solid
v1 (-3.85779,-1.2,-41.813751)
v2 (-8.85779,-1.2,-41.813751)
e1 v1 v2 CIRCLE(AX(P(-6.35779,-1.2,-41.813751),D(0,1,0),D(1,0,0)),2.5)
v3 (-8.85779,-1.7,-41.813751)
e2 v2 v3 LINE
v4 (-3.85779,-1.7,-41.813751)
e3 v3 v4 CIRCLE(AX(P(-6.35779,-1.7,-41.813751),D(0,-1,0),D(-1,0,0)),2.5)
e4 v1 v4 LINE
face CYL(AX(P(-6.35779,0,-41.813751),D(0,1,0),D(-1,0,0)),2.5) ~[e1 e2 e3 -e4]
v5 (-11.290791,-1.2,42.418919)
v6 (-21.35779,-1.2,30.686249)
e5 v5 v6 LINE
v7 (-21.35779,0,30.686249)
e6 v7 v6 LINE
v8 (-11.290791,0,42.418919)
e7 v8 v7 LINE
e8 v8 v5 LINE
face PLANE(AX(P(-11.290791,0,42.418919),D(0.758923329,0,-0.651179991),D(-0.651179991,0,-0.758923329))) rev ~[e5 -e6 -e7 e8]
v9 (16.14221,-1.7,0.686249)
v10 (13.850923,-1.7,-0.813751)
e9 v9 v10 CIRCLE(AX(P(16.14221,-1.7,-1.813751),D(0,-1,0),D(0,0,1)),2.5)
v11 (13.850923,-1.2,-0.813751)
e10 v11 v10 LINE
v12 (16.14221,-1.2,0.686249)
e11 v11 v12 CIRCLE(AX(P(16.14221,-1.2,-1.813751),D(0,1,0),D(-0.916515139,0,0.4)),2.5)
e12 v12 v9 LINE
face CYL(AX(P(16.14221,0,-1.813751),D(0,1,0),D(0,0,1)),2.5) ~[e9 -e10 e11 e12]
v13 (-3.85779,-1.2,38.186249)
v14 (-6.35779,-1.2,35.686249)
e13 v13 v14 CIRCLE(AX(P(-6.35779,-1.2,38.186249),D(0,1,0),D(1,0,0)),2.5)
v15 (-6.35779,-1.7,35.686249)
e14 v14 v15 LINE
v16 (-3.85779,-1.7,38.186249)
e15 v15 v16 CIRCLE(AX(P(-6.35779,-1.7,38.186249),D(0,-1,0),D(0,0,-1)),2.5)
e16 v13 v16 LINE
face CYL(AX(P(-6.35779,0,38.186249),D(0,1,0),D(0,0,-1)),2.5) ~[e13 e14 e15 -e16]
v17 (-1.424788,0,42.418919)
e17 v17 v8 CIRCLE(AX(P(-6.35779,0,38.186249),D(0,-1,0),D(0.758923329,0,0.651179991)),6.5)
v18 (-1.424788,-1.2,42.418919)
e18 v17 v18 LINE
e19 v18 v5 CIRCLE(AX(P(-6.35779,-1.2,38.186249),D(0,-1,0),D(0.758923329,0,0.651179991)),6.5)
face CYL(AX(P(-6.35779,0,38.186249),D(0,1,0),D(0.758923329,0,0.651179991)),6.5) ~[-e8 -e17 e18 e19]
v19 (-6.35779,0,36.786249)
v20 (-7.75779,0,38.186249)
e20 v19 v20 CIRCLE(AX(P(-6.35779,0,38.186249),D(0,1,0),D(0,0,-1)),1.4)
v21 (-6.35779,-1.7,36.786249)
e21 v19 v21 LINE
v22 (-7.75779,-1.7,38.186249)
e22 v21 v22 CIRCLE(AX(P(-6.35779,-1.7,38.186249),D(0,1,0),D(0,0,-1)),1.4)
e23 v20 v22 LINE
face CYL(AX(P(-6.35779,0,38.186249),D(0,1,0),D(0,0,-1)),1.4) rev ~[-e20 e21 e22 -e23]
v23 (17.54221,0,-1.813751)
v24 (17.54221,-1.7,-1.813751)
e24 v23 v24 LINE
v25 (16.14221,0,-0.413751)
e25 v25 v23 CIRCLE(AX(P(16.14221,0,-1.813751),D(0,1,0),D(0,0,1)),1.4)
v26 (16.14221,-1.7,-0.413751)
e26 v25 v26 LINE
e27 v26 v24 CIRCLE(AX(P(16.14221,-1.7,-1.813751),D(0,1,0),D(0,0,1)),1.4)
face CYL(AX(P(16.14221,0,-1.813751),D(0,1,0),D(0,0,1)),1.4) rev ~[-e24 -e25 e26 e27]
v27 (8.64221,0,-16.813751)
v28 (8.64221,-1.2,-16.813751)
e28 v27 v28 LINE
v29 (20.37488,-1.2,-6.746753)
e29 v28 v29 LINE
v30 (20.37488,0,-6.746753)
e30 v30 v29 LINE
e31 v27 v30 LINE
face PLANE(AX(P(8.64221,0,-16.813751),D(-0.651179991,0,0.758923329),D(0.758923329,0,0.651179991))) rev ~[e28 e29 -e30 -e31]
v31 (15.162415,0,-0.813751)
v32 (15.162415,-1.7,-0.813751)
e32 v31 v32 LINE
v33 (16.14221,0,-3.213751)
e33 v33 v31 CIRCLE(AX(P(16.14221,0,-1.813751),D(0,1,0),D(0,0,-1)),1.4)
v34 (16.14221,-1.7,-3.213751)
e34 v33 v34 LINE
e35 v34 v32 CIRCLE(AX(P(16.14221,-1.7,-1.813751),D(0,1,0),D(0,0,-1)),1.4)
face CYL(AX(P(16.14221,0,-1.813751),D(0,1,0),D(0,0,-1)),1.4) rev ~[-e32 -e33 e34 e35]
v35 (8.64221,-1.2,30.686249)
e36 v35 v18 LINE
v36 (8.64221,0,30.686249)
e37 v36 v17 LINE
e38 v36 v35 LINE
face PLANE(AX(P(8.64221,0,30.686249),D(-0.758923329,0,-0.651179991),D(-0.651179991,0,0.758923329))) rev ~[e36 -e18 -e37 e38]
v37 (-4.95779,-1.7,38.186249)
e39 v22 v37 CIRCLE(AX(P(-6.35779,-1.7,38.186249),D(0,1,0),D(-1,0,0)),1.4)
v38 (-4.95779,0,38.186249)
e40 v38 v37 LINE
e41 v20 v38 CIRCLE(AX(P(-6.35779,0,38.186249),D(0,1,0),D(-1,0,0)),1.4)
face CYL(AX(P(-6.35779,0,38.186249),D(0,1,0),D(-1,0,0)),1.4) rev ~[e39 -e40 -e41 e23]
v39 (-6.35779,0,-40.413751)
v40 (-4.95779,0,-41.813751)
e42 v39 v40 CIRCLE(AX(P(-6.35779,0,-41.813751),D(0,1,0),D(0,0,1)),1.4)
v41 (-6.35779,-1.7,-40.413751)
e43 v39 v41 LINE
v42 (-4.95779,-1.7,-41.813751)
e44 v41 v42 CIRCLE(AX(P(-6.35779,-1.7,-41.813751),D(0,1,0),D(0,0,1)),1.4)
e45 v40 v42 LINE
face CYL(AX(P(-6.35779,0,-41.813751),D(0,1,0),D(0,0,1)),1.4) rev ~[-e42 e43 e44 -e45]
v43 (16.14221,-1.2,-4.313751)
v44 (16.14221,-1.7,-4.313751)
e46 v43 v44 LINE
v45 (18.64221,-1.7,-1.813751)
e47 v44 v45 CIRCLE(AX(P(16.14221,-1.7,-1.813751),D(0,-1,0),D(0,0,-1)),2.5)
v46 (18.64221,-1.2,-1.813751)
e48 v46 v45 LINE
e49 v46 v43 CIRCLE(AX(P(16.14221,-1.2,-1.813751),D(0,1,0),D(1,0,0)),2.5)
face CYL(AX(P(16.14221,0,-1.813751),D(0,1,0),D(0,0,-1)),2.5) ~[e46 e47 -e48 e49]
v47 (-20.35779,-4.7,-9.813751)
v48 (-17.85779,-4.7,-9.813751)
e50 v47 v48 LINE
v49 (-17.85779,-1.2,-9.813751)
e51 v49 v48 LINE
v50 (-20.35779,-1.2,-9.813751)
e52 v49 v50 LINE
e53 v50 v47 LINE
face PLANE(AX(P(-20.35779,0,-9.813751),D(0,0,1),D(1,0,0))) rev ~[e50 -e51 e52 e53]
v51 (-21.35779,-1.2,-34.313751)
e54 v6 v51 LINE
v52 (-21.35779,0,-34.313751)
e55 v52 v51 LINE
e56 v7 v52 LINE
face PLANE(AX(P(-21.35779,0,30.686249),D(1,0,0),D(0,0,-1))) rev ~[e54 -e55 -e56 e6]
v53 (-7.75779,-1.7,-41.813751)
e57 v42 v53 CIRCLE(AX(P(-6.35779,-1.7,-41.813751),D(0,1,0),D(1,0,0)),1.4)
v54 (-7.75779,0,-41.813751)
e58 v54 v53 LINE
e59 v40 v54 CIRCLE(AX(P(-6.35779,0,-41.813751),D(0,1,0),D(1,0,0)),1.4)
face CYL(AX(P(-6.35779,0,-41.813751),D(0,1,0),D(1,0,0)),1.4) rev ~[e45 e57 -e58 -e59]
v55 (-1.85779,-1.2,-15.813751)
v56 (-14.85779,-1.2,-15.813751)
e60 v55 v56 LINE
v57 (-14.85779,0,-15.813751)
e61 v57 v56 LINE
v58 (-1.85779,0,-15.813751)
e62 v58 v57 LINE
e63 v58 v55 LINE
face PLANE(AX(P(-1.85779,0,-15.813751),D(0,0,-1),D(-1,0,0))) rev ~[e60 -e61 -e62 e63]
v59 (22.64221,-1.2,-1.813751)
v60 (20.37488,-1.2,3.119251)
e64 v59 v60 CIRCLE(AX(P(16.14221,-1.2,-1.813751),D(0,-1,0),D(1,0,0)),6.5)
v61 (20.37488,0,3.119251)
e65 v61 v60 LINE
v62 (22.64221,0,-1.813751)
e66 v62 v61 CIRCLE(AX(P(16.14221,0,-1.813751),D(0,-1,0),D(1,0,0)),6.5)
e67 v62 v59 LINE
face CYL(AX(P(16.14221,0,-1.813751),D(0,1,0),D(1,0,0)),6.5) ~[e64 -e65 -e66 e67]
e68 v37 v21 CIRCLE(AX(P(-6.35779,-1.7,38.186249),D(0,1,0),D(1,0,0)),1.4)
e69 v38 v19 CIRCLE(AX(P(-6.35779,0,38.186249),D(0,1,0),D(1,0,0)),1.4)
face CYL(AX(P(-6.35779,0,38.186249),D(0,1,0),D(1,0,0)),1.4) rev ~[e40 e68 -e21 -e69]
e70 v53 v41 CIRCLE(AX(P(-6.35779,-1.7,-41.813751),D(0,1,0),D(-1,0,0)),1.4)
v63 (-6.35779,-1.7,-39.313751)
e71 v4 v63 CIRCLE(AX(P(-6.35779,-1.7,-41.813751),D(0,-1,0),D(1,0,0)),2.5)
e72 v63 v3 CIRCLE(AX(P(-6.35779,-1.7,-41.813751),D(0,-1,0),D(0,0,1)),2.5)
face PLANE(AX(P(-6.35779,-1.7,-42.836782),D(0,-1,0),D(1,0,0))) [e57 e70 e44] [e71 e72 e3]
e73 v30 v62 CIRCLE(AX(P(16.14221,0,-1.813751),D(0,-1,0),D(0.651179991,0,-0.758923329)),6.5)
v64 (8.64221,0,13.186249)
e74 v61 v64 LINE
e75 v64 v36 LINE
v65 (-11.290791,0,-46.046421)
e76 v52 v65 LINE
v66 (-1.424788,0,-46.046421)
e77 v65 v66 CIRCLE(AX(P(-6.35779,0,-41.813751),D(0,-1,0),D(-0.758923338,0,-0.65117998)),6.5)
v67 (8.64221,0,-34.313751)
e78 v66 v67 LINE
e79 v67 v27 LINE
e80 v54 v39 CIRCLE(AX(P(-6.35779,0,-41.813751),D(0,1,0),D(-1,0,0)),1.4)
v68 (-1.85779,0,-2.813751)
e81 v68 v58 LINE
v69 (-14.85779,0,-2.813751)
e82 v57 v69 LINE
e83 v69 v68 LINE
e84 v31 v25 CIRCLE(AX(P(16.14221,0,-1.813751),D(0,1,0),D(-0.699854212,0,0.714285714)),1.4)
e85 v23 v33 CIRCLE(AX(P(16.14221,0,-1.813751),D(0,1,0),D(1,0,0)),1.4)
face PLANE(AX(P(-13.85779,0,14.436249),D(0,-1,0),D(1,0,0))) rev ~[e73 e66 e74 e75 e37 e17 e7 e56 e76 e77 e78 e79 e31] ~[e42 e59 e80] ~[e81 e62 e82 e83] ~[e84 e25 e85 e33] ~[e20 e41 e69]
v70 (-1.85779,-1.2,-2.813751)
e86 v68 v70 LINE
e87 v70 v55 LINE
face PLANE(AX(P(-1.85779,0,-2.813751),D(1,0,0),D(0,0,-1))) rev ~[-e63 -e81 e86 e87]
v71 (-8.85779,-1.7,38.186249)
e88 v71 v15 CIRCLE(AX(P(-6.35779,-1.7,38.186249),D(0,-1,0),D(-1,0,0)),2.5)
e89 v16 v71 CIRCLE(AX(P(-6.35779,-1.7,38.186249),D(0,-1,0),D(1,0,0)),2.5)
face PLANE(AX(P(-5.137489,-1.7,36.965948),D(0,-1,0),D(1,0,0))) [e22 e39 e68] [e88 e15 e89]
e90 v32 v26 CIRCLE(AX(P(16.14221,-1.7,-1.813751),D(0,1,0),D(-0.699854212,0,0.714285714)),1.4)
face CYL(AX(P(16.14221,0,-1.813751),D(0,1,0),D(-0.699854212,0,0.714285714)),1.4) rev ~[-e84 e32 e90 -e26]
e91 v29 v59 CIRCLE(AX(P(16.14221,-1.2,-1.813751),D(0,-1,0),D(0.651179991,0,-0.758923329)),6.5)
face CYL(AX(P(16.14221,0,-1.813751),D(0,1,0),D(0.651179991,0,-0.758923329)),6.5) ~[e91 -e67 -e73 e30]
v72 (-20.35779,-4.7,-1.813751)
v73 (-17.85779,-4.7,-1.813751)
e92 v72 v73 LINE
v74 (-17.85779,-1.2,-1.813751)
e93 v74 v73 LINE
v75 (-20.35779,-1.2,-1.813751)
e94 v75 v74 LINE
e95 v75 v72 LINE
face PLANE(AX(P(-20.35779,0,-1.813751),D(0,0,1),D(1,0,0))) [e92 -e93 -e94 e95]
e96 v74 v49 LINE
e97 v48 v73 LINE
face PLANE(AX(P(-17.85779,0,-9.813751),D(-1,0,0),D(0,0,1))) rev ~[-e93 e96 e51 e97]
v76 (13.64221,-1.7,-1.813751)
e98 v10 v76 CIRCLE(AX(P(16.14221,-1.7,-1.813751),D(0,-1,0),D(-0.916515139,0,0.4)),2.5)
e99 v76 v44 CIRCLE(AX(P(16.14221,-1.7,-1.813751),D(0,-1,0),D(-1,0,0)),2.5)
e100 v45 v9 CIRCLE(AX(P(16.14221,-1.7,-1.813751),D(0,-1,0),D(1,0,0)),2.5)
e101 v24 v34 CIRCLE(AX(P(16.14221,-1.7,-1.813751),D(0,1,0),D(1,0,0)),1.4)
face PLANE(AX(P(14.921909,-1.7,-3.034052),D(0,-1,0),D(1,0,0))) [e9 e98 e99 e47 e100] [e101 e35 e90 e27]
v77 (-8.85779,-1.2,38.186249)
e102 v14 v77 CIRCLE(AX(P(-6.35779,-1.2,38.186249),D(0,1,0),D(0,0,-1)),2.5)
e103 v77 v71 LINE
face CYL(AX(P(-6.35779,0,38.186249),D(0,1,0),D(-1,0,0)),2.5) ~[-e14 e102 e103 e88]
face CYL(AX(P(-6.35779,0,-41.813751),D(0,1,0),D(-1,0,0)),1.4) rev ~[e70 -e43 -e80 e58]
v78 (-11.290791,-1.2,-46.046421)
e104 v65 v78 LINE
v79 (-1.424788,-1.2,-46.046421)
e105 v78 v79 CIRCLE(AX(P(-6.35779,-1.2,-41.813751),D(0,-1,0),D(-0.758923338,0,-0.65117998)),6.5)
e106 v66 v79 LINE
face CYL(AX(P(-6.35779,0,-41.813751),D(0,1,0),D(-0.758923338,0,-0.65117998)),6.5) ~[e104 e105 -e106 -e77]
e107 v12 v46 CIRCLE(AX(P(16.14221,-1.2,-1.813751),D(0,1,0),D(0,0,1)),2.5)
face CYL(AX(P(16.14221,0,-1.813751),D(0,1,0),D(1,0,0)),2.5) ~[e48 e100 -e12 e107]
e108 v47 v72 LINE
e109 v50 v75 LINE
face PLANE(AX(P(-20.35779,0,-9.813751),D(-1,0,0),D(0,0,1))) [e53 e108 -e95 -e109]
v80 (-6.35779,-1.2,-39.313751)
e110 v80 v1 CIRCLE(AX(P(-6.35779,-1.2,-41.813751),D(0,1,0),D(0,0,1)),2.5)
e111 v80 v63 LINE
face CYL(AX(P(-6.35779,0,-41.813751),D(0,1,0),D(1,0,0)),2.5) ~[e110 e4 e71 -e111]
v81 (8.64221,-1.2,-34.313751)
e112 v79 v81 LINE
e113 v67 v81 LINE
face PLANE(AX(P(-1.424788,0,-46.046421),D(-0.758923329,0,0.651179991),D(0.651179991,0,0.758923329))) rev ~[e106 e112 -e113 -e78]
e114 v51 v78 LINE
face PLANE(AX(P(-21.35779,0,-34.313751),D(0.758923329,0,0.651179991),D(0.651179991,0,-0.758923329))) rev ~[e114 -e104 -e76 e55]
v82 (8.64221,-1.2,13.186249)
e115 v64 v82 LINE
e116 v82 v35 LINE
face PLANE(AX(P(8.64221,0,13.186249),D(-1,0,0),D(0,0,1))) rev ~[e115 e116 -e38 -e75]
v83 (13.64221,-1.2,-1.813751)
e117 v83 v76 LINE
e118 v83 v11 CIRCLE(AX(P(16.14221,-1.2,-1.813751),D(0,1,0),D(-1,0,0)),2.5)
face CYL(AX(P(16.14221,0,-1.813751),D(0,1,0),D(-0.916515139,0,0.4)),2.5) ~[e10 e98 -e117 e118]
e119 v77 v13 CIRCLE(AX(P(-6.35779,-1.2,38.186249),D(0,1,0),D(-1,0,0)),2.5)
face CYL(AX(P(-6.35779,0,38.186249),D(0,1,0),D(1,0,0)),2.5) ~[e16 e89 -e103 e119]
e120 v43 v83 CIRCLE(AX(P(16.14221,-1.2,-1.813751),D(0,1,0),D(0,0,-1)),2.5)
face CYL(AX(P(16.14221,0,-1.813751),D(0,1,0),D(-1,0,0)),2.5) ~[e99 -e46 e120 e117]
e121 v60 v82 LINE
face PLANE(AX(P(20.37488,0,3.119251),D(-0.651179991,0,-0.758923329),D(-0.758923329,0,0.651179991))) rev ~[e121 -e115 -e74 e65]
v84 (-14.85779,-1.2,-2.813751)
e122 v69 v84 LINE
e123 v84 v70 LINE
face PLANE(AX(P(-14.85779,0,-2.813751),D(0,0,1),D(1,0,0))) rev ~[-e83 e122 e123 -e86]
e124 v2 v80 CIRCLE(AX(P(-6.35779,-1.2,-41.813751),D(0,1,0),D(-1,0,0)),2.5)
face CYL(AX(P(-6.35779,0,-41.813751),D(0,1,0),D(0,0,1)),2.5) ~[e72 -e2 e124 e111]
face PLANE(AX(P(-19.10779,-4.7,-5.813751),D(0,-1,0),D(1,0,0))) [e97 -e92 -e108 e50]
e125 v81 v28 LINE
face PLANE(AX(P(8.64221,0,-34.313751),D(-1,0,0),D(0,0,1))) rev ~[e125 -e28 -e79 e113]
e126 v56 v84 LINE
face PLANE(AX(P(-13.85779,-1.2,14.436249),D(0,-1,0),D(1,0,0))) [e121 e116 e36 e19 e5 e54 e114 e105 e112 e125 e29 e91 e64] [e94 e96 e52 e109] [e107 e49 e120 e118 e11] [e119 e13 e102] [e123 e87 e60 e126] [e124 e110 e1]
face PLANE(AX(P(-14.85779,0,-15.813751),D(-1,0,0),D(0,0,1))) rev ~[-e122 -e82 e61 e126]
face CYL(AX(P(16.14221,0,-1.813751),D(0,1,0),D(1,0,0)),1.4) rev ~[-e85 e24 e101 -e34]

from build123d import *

# Parameters (mm, degrees)
F1_DEPTH = 1.2
F2_DEPTH = 1.7
F0_W     = 2.5
F0_H     = 8
F3_DEPTH = 4.7


with BuildPart() as f1:
    # F0 (on Front) → F1 (new body)
    with BuildSketch(Plane.XZ):
        Polygon((-6.3577895987, -1.8137509867), (-6.3577895987, 30.6862490133), (-12.8577895987, 30.6862490133), (-21.3577895987, 30.6862490133), (-21.3577895987, -1.8137509867), (-20.3577895987, -1.8137509867), (-17.8577895987, -1.8137509867), align=None)
        Polygon((0.1422104013, 30.6862490133), (-6.3577895987, 30.6862490133), (-6.3577895987, -1.8137509867), (8.6422104013, -1.8137509867), (8.6422104013, -0.8137509867), (8.6422104013, 4.6862490133), (8.6422104013, 13.1862490133), (8.6422104013, 30.6862490133), align=None)
        with BuildLine():
            Line((-21.3577895987, 30.6862490133), (-12.8577895987, 30.6862490133))
            Line((-12.8577895987, 30.6862490133), (-12.8577895987, 38.1862490133))
            ThreePointArc((-12.8577895987, 38.1862490133), (-12.4534647314, 40.4429600442), (-11.2907912366, 42.4189189557))
            Line((-11.2907912366, 42.4189189557), (-21.3577895987, 30.6862490133))
        make_face()
        with BuildLine():
            Line((0.1422104013, 38.1862490133), (0.1422104013, 30.6862490133))
            Line((0.1422104013, 30.6862490133), (8.6422104013, 30.6862490133))
            Line((8.6422104013, 30.6862490133), (-1.4247879609, 42.4189189557))
            ThreePointArc((-1.4247879609, 42.4189189557), (-0.2621144661, 40.4429600442), (0.1422104013, 38.1862490133))
        make_face()
        Polygon((8.6422104013, -1.8137509867), (-6.3577895987, -1.8137509867), (-6.3577895987, -2.8137509867), (-1.8577895987, -2.8137509867), (-1.8577895987, -15.8137509867), (-6.3577895987, -15.8137509867), (-6.3577895987, -34.3137509867), (0.1422104013, -34.3137509867), (8.6422104013, -34.3137509867), (8.6422104013, -16.8137509867), (8.6422104013, -8.3137509867), align=None)
        Polygon((-6.3577895987, -2.8137509867), (-6.3577895987, -1.8137509867), (-17.8577895987, -1.8137509867), (-17.8577895987, -9.8137509867), (-20.3577895987, -9.8137509867), (-20.3577895987, -1.8137509867), (-21.3577895987, -1.8137509867), (-21.3577895987, -34.3137509867), (-12.8577895987, -34.3137509867), (-6.3577895987, -34.3137509867), (-6.3577895987, -15.8137509867), (-14.8577895987, -15.8137509867), (-14.8577895987, -2.8137509867), align=None)
        with BuildLine():
            ThreePointArc((-11.2907912366, 42.4189189557), (-12.4534647314, 40.4429600442), (-12.8577895987, 38.1862490133))
            Line((-12.8577895987, 38.1862490133), (-8.8577895987, 38.1862490133))
            ThreePointArc((-8.8577895987, 38.1862490133), (-6.3577895987, 40.6862490133), (-3.8577895987, 38.1862490133))
            Line((-3.8577895987, 38.1862490133), (0.1422104013, 38.1862490133))
            ThreePointArc((0.1422104013, 38.1862490133), (-0.2621144661, 40.4429600442), (-1.4247879609, 42.4189189557))
            ThreePointArc((-1.4247879609, 42.4189189557), (-6.3577895987, 44.6862490133), (-11.2907912366, 42.4189189557))
        make_face()
        with BuildLine():
            Line((20.3748803436, 3.1192506512), (8.6422104013, 13.1862490133))
            Line((8.6422104013, 13.1862490133), (8.6422104013, 4.6862490133))
            Line((8.6422104013, 4.6862490133), (16.1422104013, 4.6862490133))
            ThreePointArc((16.1422104013, 4.6862490133), (18.3989214322, 4.281924146), (20.3748803436, 3.1192506512))
        make_face()
        with BuildLine():
            Line((16.1422104013, -8.3137509867), (8.6422104013, -8.3137509867))
            Line((8.6422104013, -8.3137509867), (8.6422104013, -16.8137509867))
            Line((8.6422104013, -16.8137509867), (20.3748803436, -6.7467526245))
            ThreePointArc((20.3748803436, -6.7467526245), (18.3989214322, -7.9094261194), (16.1422104013, -8.3137509867))
        make_face()
        with BuildLine():
            Line((-12.8577895987, -34.3137509867), (-21.3577895987, -34.3137509867))
            Line((-21.3577895987, -34.3137509867), (-11.290791296, -46.0464208599))
            ThreePointArc((-11.290791296, -46.0464208599), (-12.4534647472, -44.0704619748), (-12.8577895987, -41.8137509867))
            Line((-12.8577895987, -41.8137509867), (-12.8577895987, -34.3137509867))
        make_face()
        with BuildLine():
            ThreePointArc((22.6422104013, -1.8137509867), (22.0482392966, 0.9008065624), (20.3748803436, 3.1192506512))
            ThreePointArc((20.3748803436, 3.1192506512), (18.3989214322, 4.281924146), (16.1422104013, 4.6862490133))
            Line((16.1422104013, 4.6862490133), (16.1422104013, 0.6862490133))
            ThreePointArc((16.1422104013, 0.6862490133), (17.9099773542, -0.0459840337), (18.6422104013, -1.8137509867))
            ThreePointArc((18.6422104013, -1.8137509867), (17.9099773542, -3.5815179397), (16.1422104013, -4.3137509867))
            Line((16.1422104013, -4.3137509867), (16.1422104013, -8.3137509867))
            ThreePointArc((16.1422104013, -8.3137509867), (18.3989214322, -7.9094261194), (20.3748803436, -6.7467526245))
            ThreePointArc((20.3748803436, -6.7467526245), (22.0482392966, -4.5283085358), (22.6422104013, -1.8137509867))
        make_face()
        with BuildLine():
            ThreePointArc((-12.8577895987, -41.8137509867), (-12.4534647472, -44.0704619748), (-11.290791296, -46.0464208599))
            ThreePointArc((-11.290791296, -46.0464208599), (-6.3577896443, -48.3137509867), (-1.4247879609, -46.0464209291))
            ThreePointArc((-1.4247879609, -46.0464209291), (-0.2621144661, -44.0704620176), (0.1422104013, -41.8137509867))
            Line((0.1422104013, -41.8137509867), (-3.8577895987, -41.8137509867))
            ThreePointArc((-3.8577895987, -41.8137509867), (-6.3577895987, -44.3137509867), (-8.8577895987, -41.8137509867))
            Line((-8.8577895987, -41.8137509867), (-12.8577895987, -41.8137509867))
        make_face()
        with BuildLine():
            Line((8.6422104013, -34.3137509867), (0.1422104013, -34.3137509867))
            Line((0.1422104013, -34.3137509867), (0.1422104013, -41.8137509867))
            ThreePointArc((0.1422104013, -41.8137509867), (-0.2621144661, -44.0704620176), (-1.4247879609, -46.0464209291))
            Line((-1.4247879609, -46.0464209291), (8.6422104013, -34.3137509867))
        make_face()
        with BuildLine():
            ThreePointArc((-12.8577895987, 38.1862490133), (-10.9539836765, 33.5900549356), (-6.3577895987, 31.6862490133))
            Line((-6.3577895987, 31.6862490133), (-6.3577895987, 35.6862490133))
            ThreePointArc((-6.3577895987, 35.6862490133), (-8.1255565517, 36.4184820603), (-8.8577895987, 38.1862490133))
            Line((-8.8577895987, 38.1862490133), (-12.8577895987, 38.1862490133))
        make_face()
        with BuildLine():
            Line((-12.8577895987, 30.6862490133), (-6.3577895987, 30.6862490133))
            Line((-6.3577895987, 30.6862490133), (-6.3577895987, 31.6862490133))
            ThreePointArc((-6.3577895987, 31.6862490133), (-10.9539836765, 33.5900549356), (-12.8577895987, 38.1862490133))
            Line((-12.8577895987, 38.1862490133), (-12.8577895987, 30.6862490133))
        make_face()
        with BuildLine():
            Line((13.6422104013, -1.8137509867), (9.6422104013, -1.8137509867))
            ThreePointArc((9.6422104013, -1.8137509867), (11.5460163235, -6.4099450644), (16.1422104013, -8.3137509867))
            Line((16.1422104013, -8.3137509867), (16.1422104013, -4.3137509867))
            ThreePointArc((16.1422104013, -4.3137509867), (14.3744434483, -3.5815179397), (13.6422104013, -1.8137509867))
        make_face()
        with BuildLine():
            Line((8.6422104013, 4.6862490133), (8.6422104013, -0.8137509867))
            Line((8.6422104013, -0.8137509867), (9.7195941119, -0.8137509867))
            ThreePointArc((9.7195941119, -0.8137509867), (11.9143267699, 3.1233534278), (16.1422104013, 4.6862490133))
            Line((16.1422104013, 4.6862490133), (8.6422104013, 4.6862490133))
        make_face()
        with BuildLine():
            Line((0.1422104013, -34.3137509867), (-6.3577895987, -34.3137509867))
            Line((-6.3577895987, -34.3137509867), (-6.3577895987, -35.3137509867))
            ThreePointArc((-6.3577895987, -35.3137509867), (-1.761595521, -37.217556909), (0.1422104013, -41.8137509867))
            Line((0.1422104013, -41.8137509867), (0.1422104013, -34.3137509867))
        make_face()
        with BuildLine():
            Line((-6.3577895987, -35.3137509867), (-6.3577895987, -34.3137509867))
            Line((-6.3577895987, -34.3137509867), (-12.8577895987, -34.3137509867))
            Line((-12.8577895987, -34.3137509867), (-12.8577895987, -41.8137509867))
            ThreePointArc((-12.8577895987, -41.8137509867), (-10.9539836765, -37.217556909), (-6.3577895987, -35.3137509867))
        make_face()
        with BuildLine():
            Line((-6.3577895987, -39.3137509867), (-6.3577895987, -35.3137509867))
            ThreePointArc((-6.3577895987, -35.3137509867), (-10.9539836765, -37.217556909), (-12.8577895987, -41.8137509867))
            Line((-12.8577895987, -41.8137509867), (-8.8577895987, -41.8137509867))
            ThreePointArc((-8.8577895987, -41.8137509867), (-8.1255565517, -40.0459840337), (-6.3577895987, -39.3137509867))
        make_face()
        with BuildLine():
            ThreePointArc((0.1422104013, -41.8137509867), (-1.761595521, -37.217556909), (-6.3577895987, -35.3137509867))
            Line((-6.3577895987, -35.3137509867), (-6.3577895987, -39.3137509867))
            ThreePointArc((-6.3577895987, -39.3137509867), (-4.5900226458, -40.0459840337), (-3.8577895987, -41.8137509867))
            Line((-3.8577895987, -41.8137509867), (0.1422104013, -41.8137509867))
        make_face()
        with BuildLine():
            Line((-6.3577895987, 31.6862490133), (-6.3577895987, 30.6862490133))
            Line((-6.3577895987, 30.6862490133), (0.1422104013, 30.6862490133))
            Line((0.1422104013, 30.6862490133), (0.1422104013, 38.1862490133))
            ThreePointArc((0.1422104013, 38.1862490133), (-1.761595521, 33.5900549356), (-6.3577895987, 31.6862490133))
        make_face()
        with BuildLine():
            Line((-6.3577895987, 35.6862490133), (-6.3577895987, 31.6862490133))
            ThreePointArc((-6.3577895987, 31.6862490133), (-1.761595521, 33.5900549356), (0.1422104013, 38.1862490133))
            Line((0.1422104013, 38.1862490133), (-3.8577895987, 38.1862490133))
            ThreePointArc((-3.8577895987, 38.1862490133), (-4.5900226458, 36.4184820603), (-6.3577895987, 35.6862490133))
        make_face()
        with BuildLine():
            Line((9.6422104013, -1.8137509867), (8.6422104013, -1.8137509867))
            Line((8.6422104013, -1.8137509867), (8.6422104013, -8.3137509867))
            Line((8.6422104013, -8.3137509867), (16.1422104013, -8.3137509867))
            ThreePointArc((16.1422104013, -8.3137509867), (11.5460163235, -6.4099450644), (9.6422104013, -1.8137509867))
        make_face()
        with BuildLine():
            ThreePointArc((16.1422104013, 4.6862490133), (11.9143267699, 3.1233534278), (9.7195941119, -0.8137509867))
            Line((9.7195941119, -0.8137509867), (13.8509225538, -0.8137509867))
            ThreePointArc((13.8509225538, -0.8137509867), (14.7729040075, 0.2778990796), (16.1422104013, 0.6862490133))
            Line((16.1422104013, 0.6862490133), (16.1422104013, 4.6862490133))
        make_face()
        with BuildLine():
            ThreePointArc((9.7195941119, -0.8137509867), (9.6615852045, -1.3122561615), (9.6422104013, -1.8137509867))
            Line((9.6422104013, -1.8137509867), (13.6422104013, -1.8137509867))
            ThreePointArc((13.6422104013, -1.8137509867), (13.6949446189, -1.3029768775), (13.8509225538, -0.8137509867))
            Line((13.8509225538, -0.8137509867), (9.7195941119, -0.8137509867))
        make_face()
        with BuildLine():
            Line((8.6422104013, -0.8137509867), (8.6422104013, -1.8137509867))
            Line((8.6422104013, -1.8137509867), (9.6422104013, -1.8137509867))
            ThreePointArc((9.6422104013, -1.8137509867), (9.6615852045, -1.3122561615), (9.7195941119, -0.8137509867))
            Line((9.7195941119, -0.8137509867), (8.6422104013, -0.8137509867))
        make_face()
    extrude(amount=F1_DEPTH)

    # F0 (on Front) → F2 (join)
    with BuildSketch(Plane.XZ):
        with BuildLine():
            Line((-6.3577895987, 36.7862490133), (-6.3577895987, 35.6862490133))
            ThreePointArc((-6.3577895987, 35.6862490133), (-4.5900226458, 36.4184820603), (-3.8577895987, 38.1862490133))
            Line((-3.8577895987, 38.1862490133), (-4.9577895987, 38.1862490133))
            ThreePointArc((-4.9577895987, 38.1862490133), (-5.3678401051, 37.1962995197), (-6.3577895987, 36.7862490133))
        make_face()
        with BuildLine():
            ThreePointArc((-3.8577895987, 38.1862490133), (-6.3577895987, 40.6862490133), (-8.8577895987, 38.1862490133))
            Line((-8.8577895987, 38.1862490133), (-7.7577895987, 38.1862490133))
            ThreePointArc((-7.7577895987, 38.1862490133), (-6.3577895987, 39.5862490133), (-4.9577895987, 38.1862490133))
            Line((-4.9577895987, 38.1862490133), (-3.8577895987, 38.1862490133))
        make_face()
        with BuildLine():
            ThreePointArc((-8.8577895987, 38.1862490133), (-8.1255565517, 36.4184820603), (-6.3577895987, 35.6862490133))
            Line((-6.3577895987, 35.6862490133), (-6.3577895987, 36.7862490133))
            ThreePointArc((-6.3577895987, 36.7862490133), (-7.3477390924, 37.1962995197), (-7.7577895987, 38.1862490133))
            Line((-7.7577895987, 38.1862490133), (-8.8577895987, 38.1862490133))
        make_face()
        with BuildLine():
            Line((14.7422104013, -1.8137509867), (13.6422104013, -1.8137509867))
            ThreePointArc((13.6422104013, -1.8137509867), (14.3744434483, -3.5815179397), (16.1422104013, -4.3137509867))
            Line((16.1422104013, -4.3137509867), (16.1422104013, -3.2137509867))
            ThreePointArc((16.1422104013, -3.2137509867), (15.1522609076, -2.8037004803), (14.7422104013, -1.8137509867))
        make_face()
        with BuildLine():
            Line((16.1422104013, -3.2137509867), (16.1422104013, -4.3137509867))
            ThreePointArc((16.1422104013, -4.3137509867), (17.9099773542, -3.5815179397), (18.6422104013, -1.8137509867))
            ThreePointArc((18.6422104013, -1.8137509867), (17.9099773542, -0.0459840337), (16.1422104013, 0.6862490133))
            Line((16.1422104013, 0.6862490133), (16.1422104013, -0.4137509867))
            ThreePointArc((16.1422104013, -0.4137509867), (17.1321598949, -0.823801493), (17.5422104013, -1.8137509867))
            ThreePointArc((17.5422104013, -1.8137509867), (17.1321598949, -2.8037004803), (16.1422104013, -3.2137509867))
        make_face()
        with BuildLine():
            Line((-7.7577895987, -41.8137509867), (-8.8577895987, -41.8137509867))
            ThreePointArc((-8.8577895987, -41.8137509867), (-6.3577895987, -44.3137509867), (-3.8577895987, -41.8137509867))
            Line((-3.8577895987, -41.8137509867), (-4.9577895987, -41.8137509867))
            ThreePointArc((-4.9577895987, -41.8137509867), (-6.3577895987, -43.2137509867), (-7.7577895987, -41.8137509867))
        make_face()
        with BuildLine():
            Line((-6.3577895987, -40.4137509867), (-6.3577895987, -39.3137509867))
            ThreePointArc((-6.3577895987, -39.3137509867), (-8.1255565517, -40.0459840337), (-8.8577895987, -41.8137509867))
            Line((-8.8577895987, -41.8137509867), (-7.7577895987, -41.8137509867))
            ThreePointArc((-7.7577895987, -41.8137509867), (-7.3477390924, -40.823801493), (-6.3577895987, -40.4137509867))
        make_face()
        with BuildLine():
            ThreePointArc((-3.8577895987, -41.8137509867), (-4.5900226458, -40.0459840337), (-6.3577895987, -39.3137509867))
            Line((-6.3577895987, -39.3137509867), (-6.3577895987, -40.4137509867))
            ThreePointArc((-6.3577895987, -40.4137509867), (-5.3678401051, -40.823801493), (-4.9577895987, -41.8137509867))
            Line((-4.9577895987, -41.8137509867), (-3.8577895987, -41.8137509867))
        make_face()
        with BuildLine():
            ThreePointArc((16.1422104013, 0.6862490133), (14.7729040075, 0.2778990796), (13.8509225538, -0.8137509867))
            Line((13.8509225538, -0.8137509867), (15.1624145041, -0.8137509867))
            ThreePointArc((15.1624145041, -0.8137509867), (15.613060139, -0.517602847), (16.1422104013, -0.4137509867))
            Line((16.1422104013, -0.4137509867), (16.1422104013, 0.6862490133))
        make_face()
        with BuildLine():
            ThreePointArc((13.8509225538, -0.8137509867), (13.6949446189, -1.3029768775), (13.6422104013, -1.8137509867))
            Line((13.6422104013, -1.8137509867), (14.7422104013, -1.8137509867))
            ThreePointArc((14.7422104013, -1.8137509867), (14.8515295236, -1.2714015864), (15.1624145041, -0.8137509867))
            Line((15.1624145041, -0.8137509867), (13.8509225538, -0.8137509867))
        make_face()
    extrude(amount=F2_DEPTH)

    # F0 (on Front) → F3 (join)
    with BuildSketch(Plane.XZ):
        with Locations((-19.1077895987, -5.8137509867)):
            Rectangle(F0_W, F0_H)
    extrude(amount=F3_DEPTH)


solid = f1.part
